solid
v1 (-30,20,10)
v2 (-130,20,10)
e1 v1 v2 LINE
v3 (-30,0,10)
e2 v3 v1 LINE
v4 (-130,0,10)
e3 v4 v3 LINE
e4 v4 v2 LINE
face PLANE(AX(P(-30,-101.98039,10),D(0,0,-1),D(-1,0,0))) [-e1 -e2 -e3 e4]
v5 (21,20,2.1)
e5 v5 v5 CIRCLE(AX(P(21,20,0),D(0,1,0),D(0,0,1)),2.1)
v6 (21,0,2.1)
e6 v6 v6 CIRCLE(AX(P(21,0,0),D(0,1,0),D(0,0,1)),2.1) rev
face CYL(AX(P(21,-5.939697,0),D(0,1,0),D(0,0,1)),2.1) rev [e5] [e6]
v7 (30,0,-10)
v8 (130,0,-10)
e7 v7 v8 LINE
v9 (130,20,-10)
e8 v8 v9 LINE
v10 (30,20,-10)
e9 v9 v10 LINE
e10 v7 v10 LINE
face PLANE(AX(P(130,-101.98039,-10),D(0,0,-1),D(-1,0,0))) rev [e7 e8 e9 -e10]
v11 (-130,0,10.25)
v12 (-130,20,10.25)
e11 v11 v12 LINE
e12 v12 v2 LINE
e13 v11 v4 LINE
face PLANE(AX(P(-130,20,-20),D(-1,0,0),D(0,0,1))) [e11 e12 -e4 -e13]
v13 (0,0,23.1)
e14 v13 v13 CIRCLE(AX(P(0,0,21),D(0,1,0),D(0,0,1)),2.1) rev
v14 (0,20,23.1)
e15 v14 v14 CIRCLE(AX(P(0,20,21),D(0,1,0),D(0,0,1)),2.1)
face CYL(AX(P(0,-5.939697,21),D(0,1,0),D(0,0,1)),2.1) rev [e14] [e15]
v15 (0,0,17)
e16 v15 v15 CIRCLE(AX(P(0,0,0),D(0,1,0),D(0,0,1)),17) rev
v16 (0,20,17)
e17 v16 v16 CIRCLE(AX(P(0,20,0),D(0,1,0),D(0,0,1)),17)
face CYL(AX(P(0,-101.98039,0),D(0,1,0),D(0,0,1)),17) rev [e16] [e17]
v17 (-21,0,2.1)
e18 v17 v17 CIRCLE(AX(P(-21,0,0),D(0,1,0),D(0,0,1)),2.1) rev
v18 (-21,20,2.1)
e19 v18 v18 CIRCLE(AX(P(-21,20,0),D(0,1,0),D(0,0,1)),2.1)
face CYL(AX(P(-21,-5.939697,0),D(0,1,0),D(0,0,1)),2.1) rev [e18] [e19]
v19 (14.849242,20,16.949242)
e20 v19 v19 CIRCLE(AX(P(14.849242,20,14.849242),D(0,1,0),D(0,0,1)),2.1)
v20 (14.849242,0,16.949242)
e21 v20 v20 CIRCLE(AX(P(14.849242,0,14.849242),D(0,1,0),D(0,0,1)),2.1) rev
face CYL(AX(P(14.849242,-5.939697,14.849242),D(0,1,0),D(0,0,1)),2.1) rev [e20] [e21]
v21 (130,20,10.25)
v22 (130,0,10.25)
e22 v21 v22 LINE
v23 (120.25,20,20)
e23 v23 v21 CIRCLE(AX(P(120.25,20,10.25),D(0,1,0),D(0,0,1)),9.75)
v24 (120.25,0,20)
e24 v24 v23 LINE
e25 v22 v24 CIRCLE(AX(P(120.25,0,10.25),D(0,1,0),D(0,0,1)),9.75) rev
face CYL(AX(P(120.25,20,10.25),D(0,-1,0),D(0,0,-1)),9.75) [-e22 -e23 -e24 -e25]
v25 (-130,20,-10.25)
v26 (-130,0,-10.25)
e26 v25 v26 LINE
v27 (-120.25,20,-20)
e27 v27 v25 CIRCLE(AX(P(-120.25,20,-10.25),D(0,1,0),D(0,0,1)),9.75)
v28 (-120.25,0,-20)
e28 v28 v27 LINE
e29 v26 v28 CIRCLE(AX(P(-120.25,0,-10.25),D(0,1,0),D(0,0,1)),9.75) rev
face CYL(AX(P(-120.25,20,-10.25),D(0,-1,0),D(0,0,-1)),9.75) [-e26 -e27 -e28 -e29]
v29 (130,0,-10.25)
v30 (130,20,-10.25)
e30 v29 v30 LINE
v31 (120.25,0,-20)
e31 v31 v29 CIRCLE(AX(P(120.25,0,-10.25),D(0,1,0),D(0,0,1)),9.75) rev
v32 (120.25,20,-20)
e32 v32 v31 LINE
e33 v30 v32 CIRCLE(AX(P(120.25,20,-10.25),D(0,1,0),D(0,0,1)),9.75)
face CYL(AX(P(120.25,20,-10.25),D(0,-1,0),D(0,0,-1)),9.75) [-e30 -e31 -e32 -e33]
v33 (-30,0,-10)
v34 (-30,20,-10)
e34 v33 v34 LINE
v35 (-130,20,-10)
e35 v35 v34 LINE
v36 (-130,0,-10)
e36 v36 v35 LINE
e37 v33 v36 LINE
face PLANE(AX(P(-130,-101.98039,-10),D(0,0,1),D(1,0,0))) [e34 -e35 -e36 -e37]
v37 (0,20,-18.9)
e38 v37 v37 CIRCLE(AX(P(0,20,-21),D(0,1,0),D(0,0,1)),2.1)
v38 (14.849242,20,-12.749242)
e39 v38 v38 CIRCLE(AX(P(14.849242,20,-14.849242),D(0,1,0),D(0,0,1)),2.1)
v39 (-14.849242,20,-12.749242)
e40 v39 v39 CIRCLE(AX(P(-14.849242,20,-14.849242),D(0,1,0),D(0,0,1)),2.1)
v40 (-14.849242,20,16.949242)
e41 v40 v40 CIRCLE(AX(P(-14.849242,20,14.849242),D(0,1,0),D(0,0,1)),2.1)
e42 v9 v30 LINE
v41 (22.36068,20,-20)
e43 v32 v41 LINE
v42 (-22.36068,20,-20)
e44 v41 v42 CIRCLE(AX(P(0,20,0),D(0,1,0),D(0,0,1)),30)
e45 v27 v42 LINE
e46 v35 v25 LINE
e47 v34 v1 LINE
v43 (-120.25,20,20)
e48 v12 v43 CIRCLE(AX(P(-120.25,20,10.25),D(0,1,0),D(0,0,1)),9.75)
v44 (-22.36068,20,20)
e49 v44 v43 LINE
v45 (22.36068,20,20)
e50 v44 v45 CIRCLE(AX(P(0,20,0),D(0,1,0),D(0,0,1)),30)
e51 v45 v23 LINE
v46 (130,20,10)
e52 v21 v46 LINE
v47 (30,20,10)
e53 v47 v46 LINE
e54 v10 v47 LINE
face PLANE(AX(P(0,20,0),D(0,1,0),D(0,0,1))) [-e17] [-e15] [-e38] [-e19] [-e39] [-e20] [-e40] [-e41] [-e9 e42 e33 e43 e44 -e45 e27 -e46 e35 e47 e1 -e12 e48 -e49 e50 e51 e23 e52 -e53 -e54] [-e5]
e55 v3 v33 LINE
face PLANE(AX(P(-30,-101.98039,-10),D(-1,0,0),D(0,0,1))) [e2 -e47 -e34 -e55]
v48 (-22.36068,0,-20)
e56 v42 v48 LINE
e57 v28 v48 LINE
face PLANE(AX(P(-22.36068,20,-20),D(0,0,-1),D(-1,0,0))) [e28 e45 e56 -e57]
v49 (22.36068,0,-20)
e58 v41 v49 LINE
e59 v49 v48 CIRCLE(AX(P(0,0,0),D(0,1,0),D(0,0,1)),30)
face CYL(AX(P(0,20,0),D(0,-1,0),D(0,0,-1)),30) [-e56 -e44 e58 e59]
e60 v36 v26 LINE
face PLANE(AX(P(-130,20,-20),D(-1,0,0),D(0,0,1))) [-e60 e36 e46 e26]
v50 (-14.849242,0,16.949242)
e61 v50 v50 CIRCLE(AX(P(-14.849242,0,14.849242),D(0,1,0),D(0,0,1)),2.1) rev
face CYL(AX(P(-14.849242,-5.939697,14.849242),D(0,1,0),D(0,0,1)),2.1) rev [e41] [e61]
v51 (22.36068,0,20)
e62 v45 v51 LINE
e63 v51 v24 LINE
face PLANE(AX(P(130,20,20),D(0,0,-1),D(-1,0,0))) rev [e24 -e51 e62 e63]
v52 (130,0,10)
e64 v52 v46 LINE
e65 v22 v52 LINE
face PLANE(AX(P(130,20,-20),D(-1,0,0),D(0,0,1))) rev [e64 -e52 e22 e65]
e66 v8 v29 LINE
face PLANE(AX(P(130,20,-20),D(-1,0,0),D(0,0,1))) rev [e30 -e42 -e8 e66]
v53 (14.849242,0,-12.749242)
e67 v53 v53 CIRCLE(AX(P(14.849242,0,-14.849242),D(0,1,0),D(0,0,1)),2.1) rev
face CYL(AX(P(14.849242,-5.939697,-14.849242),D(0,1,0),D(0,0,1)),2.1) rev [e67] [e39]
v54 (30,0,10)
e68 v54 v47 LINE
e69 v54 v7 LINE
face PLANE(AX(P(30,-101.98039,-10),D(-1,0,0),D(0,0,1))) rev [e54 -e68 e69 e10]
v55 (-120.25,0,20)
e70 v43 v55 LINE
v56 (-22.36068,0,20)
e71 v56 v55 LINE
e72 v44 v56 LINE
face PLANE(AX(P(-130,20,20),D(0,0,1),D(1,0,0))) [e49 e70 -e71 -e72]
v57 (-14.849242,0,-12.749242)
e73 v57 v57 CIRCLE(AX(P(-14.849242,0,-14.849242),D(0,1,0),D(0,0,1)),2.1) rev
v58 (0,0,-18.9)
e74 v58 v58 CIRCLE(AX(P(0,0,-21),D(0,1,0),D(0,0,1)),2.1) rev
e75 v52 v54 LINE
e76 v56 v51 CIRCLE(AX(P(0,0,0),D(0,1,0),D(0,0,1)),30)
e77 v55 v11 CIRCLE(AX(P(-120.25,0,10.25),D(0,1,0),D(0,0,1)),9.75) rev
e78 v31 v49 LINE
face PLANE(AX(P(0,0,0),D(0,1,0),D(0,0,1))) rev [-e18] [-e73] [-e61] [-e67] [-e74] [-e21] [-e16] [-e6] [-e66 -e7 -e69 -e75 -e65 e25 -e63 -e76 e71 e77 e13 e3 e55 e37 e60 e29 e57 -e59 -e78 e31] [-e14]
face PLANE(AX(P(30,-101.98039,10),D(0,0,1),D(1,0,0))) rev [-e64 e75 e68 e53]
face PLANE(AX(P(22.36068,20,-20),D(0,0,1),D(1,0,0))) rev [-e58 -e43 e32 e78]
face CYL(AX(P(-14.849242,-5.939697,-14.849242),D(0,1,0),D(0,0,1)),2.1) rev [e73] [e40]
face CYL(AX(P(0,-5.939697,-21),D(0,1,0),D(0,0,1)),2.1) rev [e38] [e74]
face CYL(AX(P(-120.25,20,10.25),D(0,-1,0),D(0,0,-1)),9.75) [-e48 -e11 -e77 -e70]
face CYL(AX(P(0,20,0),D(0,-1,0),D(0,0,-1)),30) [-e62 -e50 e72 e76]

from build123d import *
from build123d.topology import SkipClean

# Parameters (mm, degrees)
BOSS_EXTRUDE1_DEPTH  = 20
SKETCH2_W            = 100
SKETCH2_H            = 20
CUT_EXTRUDE1_DEPTH   = 20
FILLET1_R            = 9.75
FILLET1_OF_MIRROR4_R = 9.75
SKETCH4_R            = 2.1
CUT_EXTRUDE3_DEPTH   = 20


with BuildPart() as part:
    # Sketch1 → Boss-Extrude1 (new body)
    with BuildSketch(Plane(origin=(0, 0, 0), x_dir=(1, 0, 0), z_dir=(0, 1, 0))):
        with BuildLine():
            Line((22.360679775, 20), (130, 20))
            Line((130, 20), (130, -20))
            Line((130, -20), (22.360679775, -20))
            ThreePointArc((22.360679775, -20), (12.247448714, -27.386127875), (0, -30))
            Line((0, -30), (0, -20))
            Line((0, -20), (0, 20))
            Line((0, 20), (0, 30))
            ThreePointArc((0, 30), (12.247448714, 27.386127875), (22.360679775, 20))
        make_face()
    boss_extrude1 = extrude(amount=BOSS_EXTRUDE1_DEPTH)

    # Sketch2 → Cut-Extrude1 (cut)
    with BuildSketch(Plane(origin=(0, 20, 0), x_dir=(1, 0, 0), z_dir=(0, 1, 0))):
        with BuildLine():
            Line((0, 17), (0, -17))
            ThreePointArc((0, -17), (17, 0), (0, 17))
        make_face()
        with Locations((80, 0)):
            Rectangle(SKETCH2_W, SKETCH2_H)
    cut_extrude1 = extrude(amount=-CUT_EXTRUDE1_DEPTH, mode=Mode.SUBTRACT)

    # Fillet1
    fillet1_edges = [part.edges().sort_by_distance(p)[0] for p in [
        (130, 10, -20),
        (130, 10, 20),
    ]]
    fillet(fillet1_edges, radius=FILLET1_R)

    # Mirror4: Boss-Extrude1, Cut-Extrude1 across plane
    with SkipClean():  # the faces are left unmerged after this step: merging them gives an invalid solid
        add(boss_extrude1.mirror(Plane(origin=(0, 0, 0), x_dir=(0, 0, 1), z_dir=(1, 0, 0))))
        add(cut_extrude1.mirror(Plane(origin=(0, 0, 0), x_dir=(0, 0, 1), z_dir=(1, 0, 0))), mode=Mode.SUBTRACT)
    add(part.part.scale(1), mode=Mode.REPLACE)  # the faces are merged on a copy

    # Fillet1 of Mirror4
    fillet1_of_mirror4_edges = [part.edges().sort_by_distance(p)[0] for p in [
        (-130, 10, -20),
        (-130, 10, 20),
    ]]
    fillet(fillet1_of_mirror4_edges, radius=FILLET1_OF_MIRROR4_R)

    # Sketch4 → Cut-Extrude3 (cut)
    with BuildSketch(Plane(origin=(0, 20, 0), x_dir=(1, 0, 0), z_dir=(0, 1, 0))):
        with Locations(Location((21, 0, 0), (0, 0, 270))):
            Circle(SKETCH4_R)
        with Locations(Location((14.849242405, -14.849242405, 0), (0, 0, 270))):
            Circle(SKETCH4_R)
        with Locations(Location((0, -21, 0), (0, 0, 270))):
            Circle(SKETCH4_R)
        with Locations(Location((-14.849242405, -14.849242405, 0), (0, 0, 270))):
            Circle(SKETCH4_R)
        with Locations(Location((-21, 0, 0), (0, 0, 270))):
            Circle(SKETCH4_R)
        with Locations(Location((-14.849242405, 14.849242405, 0), (0, 0, 270))):
            Circle(SKETCH4_R)
        with Locations(Location((0, 21, 0), (0, 0, 270))):
            Circle(SKETCH4_R)
        with Locations(Location((14.849242405, 14.849242405, 0), (0, 0, 270))):
            Circle(SKETCH4_R)
    extrude(amount=-CUT_EXTRUDE3_DEPTH, mode=Mode.SUBTRACT)


solid = part.part
